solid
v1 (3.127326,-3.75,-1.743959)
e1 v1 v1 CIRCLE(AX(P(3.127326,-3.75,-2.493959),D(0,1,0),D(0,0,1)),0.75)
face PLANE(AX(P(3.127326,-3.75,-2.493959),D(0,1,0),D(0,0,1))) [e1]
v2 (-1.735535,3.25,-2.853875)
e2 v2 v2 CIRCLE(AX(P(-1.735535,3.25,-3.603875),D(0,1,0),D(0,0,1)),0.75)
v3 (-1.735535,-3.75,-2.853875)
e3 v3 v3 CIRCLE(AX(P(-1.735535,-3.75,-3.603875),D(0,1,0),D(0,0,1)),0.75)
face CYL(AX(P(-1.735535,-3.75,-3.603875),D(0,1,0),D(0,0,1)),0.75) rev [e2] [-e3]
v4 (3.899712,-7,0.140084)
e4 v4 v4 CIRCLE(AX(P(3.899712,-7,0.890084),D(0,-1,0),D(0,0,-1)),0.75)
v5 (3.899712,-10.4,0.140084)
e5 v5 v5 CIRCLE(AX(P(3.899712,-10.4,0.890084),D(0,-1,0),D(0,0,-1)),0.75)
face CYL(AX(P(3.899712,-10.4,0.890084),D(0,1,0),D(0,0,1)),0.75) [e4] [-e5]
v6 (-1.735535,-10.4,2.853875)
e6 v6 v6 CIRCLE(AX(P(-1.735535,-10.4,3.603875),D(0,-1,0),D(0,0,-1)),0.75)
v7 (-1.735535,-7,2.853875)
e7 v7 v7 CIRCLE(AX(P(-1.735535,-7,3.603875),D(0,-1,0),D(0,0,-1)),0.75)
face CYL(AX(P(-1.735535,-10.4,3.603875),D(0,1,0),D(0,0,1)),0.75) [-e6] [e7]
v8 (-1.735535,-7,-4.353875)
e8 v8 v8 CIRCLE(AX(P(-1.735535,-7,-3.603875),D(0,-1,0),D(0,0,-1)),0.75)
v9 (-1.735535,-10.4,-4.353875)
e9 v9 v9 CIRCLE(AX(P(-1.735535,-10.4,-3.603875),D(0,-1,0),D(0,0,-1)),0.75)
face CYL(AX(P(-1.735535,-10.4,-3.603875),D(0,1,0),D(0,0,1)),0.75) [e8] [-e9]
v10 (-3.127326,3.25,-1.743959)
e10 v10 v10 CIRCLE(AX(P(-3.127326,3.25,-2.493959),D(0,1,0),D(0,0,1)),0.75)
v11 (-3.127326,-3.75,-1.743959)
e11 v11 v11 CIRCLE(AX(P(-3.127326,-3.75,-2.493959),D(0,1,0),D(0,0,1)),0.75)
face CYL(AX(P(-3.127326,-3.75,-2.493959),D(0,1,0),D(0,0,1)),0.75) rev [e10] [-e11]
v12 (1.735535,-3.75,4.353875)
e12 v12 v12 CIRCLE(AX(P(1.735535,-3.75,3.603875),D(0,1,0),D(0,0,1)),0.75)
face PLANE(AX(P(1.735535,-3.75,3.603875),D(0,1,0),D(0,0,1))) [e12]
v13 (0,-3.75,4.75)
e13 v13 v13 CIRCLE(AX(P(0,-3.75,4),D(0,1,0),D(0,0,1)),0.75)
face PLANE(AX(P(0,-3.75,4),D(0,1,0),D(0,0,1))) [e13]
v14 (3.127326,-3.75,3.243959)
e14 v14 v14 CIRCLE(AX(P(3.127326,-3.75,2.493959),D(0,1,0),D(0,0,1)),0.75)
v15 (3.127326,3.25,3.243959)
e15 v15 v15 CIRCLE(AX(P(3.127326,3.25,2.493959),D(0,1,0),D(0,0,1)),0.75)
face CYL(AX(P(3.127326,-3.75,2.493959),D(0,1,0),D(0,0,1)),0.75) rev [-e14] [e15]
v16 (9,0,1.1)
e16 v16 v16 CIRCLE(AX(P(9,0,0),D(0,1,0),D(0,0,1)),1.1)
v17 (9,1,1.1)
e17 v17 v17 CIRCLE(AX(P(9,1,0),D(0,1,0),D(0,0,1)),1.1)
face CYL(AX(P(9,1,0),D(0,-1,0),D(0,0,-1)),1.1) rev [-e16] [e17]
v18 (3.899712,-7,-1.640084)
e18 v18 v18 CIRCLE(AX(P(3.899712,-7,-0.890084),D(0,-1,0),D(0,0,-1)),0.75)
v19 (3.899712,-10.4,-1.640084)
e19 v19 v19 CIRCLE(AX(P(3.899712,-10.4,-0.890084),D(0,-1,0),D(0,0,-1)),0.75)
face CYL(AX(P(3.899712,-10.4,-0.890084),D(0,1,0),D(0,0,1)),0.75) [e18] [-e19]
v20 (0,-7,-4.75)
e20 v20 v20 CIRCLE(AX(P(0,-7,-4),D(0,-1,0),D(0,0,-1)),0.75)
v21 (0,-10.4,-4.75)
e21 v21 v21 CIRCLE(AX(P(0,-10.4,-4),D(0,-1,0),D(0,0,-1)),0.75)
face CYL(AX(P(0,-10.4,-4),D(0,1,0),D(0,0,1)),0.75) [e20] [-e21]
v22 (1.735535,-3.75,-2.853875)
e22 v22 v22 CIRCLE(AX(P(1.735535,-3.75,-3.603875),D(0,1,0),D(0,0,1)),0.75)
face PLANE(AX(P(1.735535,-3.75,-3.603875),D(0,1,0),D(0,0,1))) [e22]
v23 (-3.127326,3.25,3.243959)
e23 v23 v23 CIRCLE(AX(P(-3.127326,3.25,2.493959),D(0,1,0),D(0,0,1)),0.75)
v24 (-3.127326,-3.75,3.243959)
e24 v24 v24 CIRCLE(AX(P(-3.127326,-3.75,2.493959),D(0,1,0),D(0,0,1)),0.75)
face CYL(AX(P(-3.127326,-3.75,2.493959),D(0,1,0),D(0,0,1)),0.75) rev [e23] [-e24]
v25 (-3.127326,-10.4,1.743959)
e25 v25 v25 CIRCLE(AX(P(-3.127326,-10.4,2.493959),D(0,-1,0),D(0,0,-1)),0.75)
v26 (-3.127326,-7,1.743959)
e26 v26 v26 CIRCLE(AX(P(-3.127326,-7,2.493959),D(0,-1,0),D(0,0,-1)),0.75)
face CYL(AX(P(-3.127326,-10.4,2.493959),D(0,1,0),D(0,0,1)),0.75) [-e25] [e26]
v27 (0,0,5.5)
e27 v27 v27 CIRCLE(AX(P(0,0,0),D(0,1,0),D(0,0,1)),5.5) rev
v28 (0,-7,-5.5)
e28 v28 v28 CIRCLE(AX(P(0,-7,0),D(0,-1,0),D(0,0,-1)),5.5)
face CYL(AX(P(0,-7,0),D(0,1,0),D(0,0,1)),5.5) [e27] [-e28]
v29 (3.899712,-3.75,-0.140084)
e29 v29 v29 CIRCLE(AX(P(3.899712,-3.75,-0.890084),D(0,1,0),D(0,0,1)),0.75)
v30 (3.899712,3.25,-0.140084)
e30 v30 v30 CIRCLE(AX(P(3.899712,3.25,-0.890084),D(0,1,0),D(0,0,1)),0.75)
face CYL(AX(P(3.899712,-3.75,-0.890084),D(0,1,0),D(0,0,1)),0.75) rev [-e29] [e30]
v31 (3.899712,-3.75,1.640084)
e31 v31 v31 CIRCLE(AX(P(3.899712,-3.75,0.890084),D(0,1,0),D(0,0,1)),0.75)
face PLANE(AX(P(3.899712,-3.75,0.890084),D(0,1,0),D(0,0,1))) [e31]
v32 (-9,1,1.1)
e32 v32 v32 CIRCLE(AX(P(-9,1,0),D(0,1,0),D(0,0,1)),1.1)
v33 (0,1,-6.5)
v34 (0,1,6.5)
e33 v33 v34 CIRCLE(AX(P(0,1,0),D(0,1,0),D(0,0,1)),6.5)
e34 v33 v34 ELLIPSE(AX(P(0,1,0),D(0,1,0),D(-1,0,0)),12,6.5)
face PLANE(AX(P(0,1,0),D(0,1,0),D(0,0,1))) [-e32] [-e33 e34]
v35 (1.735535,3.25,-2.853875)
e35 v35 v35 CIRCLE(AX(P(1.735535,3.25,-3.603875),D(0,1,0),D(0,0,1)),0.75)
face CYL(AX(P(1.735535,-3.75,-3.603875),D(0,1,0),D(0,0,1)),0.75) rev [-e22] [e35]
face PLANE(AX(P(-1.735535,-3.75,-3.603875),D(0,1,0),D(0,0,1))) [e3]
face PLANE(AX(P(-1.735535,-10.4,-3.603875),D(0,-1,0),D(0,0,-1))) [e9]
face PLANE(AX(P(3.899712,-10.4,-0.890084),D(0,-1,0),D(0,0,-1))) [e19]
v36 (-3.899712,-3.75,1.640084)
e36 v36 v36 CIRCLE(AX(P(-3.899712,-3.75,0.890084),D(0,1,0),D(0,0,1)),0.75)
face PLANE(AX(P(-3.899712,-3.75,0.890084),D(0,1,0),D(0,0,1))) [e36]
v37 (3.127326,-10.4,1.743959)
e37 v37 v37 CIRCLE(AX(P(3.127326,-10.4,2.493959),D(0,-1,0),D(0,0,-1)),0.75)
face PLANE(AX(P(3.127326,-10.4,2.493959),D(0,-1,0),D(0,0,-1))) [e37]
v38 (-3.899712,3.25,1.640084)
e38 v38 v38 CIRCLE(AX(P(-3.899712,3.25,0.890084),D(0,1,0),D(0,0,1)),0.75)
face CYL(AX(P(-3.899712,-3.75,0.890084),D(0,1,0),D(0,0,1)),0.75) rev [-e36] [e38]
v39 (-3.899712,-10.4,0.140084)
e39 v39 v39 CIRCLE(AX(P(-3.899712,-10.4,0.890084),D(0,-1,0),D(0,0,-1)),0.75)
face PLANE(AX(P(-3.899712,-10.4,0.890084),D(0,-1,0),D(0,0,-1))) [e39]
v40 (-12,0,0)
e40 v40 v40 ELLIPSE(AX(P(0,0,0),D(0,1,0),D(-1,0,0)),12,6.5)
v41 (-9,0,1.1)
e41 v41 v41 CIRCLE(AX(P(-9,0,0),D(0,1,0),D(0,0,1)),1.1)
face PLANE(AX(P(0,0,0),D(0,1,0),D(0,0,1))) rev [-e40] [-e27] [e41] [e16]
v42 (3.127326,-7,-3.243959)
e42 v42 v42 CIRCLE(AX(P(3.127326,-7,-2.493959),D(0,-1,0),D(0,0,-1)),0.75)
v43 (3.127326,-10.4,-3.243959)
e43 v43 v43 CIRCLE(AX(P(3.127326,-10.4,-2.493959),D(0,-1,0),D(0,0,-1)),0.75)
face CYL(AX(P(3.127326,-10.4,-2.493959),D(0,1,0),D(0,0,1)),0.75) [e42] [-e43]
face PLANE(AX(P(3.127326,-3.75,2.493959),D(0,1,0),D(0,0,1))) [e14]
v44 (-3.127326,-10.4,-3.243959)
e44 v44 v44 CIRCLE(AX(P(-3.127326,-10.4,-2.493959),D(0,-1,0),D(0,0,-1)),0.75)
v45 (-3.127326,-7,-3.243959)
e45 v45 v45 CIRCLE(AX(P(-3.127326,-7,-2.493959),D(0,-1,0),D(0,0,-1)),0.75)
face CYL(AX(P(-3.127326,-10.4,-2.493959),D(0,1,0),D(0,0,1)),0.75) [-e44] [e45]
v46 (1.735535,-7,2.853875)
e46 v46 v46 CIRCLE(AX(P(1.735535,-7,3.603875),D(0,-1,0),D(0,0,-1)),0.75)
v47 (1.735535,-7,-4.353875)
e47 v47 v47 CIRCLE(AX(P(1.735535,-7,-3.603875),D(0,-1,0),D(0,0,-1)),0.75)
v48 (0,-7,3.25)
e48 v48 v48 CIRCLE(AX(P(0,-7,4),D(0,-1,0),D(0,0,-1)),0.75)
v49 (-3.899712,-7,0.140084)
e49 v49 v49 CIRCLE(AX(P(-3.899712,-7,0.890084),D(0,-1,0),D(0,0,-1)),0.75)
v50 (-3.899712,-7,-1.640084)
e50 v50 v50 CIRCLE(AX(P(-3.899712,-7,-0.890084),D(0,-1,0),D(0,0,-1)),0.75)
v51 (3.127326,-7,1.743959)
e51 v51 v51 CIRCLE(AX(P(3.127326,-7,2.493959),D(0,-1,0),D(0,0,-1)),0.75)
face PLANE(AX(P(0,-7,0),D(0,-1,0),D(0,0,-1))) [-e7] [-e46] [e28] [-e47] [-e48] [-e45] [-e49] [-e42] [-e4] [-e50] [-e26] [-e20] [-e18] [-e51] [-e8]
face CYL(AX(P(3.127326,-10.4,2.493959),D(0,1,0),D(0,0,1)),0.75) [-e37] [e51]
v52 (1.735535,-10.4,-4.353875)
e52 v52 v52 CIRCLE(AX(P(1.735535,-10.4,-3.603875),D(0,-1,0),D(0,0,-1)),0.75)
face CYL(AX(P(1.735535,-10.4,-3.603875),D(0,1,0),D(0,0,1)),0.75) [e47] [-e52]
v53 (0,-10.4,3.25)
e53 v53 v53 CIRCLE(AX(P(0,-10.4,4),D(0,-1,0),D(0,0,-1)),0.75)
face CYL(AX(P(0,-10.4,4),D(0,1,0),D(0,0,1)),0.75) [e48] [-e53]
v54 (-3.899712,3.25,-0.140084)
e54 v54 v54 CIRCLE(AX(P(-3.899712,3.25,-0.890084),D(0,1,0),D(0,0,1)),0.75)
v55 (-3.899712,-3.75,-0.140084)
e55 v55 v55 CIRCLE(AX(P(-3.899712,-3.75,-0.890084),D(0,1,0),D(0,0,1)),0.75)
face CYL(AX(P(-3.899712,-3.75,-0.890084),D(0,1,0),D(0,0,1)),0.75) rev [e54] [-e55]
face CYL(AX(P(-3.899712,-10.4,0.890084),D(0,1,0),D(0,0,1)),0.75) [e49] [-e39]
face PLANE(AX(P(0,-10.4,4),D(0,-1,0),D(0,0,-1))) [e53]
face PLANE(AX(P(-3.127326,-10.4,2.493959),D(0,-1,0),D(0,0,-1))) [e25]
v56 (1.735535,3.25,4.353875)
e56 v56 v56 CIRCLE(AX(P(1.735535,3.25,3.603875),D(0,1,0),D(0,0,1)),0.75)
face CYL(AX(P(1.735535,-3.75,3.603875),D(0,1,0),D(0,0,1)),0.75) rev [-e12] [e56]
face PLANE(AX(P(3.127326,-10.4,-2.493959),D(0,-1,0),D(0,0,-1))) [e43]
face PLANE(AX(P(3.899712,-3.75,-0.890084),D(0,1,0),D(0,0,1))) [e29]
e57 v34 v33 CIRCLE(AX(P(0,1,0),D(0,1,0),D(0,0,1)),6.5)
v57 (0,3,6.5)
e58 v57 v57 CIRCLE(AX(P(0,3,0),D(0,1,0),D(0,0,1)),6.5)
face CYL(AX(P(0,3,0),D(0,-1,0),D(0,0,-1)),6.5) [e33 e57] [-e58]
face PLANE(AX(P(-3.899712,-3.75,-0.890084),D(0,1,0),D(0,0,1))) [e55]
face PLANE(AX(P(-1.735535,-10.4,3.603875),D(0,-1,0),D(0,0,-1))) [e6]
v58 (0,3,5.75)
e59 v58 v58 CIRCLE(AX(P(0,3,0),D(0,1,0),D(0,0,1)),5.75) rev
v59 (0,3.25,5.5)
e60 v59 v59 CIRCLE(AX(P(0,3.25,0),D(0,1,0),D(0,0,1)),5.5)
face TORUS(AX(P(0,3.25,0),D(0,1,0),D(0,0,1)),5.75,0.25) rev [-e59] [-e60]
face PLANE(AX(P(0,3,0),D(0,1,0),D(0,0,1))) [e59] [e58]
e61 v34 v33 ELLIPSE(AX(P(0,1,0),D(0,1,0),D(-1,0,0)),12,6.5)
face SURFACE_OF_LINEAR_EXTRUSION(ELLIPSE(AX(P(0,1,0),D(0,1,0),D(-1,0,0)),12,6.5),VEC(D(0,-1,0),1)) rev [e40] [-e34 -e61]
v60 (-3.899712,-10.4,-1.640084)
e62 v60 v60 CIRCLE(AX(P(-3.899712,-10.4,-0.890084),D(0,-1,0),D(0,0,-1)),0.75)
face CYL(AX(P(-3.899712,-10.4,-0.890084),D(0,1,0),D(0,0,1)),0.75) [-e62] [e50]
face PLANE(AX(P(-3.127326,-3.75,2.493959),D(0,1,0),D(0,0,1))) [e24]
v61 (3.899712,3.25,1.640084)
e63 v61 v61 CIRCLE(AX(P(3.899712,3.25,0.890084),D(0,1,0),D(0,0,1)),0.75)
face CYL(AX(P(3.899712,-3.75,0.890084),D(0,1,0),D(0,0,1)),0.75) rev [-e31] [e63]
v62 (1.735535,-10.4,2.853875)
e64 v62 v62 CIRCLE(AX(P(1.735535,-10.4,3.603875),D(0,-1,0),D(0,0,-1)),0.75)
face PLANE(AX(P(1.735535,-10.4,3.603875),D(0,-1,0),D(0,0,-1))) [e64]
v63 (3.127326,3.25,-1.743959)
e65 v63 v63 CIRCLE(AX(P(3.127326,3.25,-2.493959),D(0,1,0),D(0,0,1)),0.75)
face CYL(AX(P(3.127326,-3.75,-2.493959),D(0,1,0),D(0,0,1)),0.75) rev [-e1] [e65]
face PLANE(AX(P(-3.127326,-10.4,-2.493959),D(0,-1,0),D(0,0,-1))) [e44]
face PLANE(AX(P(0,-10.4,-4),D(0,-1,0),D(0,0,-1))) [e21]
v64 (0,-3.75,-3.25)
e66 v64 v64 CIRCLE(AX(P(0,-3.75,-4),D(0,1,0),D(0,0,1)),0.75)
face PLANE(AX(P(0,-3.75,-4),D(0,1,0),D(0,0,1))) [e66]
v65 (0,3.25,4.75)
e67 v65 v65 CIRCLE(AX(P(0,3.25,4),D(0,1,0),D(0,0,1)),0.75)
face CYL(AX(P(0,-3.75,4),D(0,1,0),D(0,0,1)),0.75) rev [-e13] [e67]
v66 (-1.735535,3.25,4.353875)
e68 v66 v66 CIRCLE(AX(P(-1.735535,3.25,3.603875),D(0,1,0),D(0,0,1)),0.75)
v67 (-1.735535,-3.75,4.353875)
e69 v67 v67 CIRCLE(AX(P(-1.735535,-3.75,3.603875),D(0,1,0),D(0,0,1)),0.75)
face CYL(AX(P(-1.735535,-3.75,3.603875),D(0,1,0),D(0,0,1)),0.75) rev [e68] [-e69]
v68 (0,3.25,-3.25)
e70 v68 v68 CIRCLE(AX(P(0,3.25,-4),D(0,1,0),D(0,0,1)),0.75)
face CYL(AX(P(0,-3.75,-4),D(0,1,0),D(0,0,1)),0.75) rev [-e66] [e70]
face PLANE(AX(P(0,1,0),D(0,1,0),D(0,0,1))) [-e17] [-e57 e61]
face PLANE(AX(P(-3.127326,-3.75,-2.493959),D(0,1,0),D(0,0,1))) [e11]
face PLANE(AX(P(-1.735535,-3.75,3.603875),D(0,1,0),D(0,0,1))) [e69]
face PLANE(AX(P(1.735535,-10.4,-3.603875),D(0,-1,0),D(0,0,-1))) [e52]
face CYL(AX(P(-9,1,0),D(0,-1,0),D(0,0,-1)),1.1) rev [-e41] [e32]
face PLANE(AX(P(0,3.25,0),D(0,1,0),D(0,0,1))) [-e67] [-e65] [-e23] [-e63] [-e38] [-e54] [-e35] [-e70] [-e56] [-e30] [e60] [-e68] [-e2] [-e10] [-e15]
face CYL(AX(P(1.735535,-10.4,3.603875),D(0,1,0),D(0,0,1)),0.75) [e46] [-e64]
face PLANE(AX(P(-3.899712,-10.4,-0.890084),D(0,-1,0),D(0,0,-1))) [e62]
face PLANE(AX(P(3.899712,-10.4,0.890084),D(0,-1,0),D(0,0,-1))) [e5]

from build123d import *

# Parameters (mm, degrees)
SKETCH1_RX          = 12
SKETCH1_RY          = 6.5
SKETCH1_R           = 1.1
BOSS_EXTRUDE1_DEPTH = 1
SKETCH2_R           = 6.5
BOSS_EXTRUDE2_DEPTH = 2
SKETCH4_R           = 5.5
BOSS_EXTRUDE3_DEPTH = 7
BOSS_EXTRUDE5_START = 0.25
SKETCH7_R           = 5.5
BOSS_EXTRUDE5_DEPTH = 0.25
SKETCH5_R           = 0.75
CUT_EXTRUDE2_DEPTH  = 7
SKETCH6_R           = 0.75
BOSS_EXTRUDE4_DEPTH = 3.4
FILLET1_R           = 0.25


with BuildPart() as part:
    # Sketch1 → Boss-Extrude1 (new body)
    with BuildSketch(Plane(origin=(0, 0, 0), x_dir=(1, 0, 0), z_dir=(0, 1, 0))):
        with Locations(Location((0, 0), (0, 0, 180))):
            Ellipse(SKETCH1_RX, SKETCH1_RY)
        with Locations(Location((-9, 0, 0), (0, 0, 270))):
            Circle(SKETCH1_R, mode=Mode.SUBTRACT)
        with Locations(Location((9, 0, 0), (0, 0, 270))):
            Circle(SKETCH1_R, mode=Mode.SUBTRACT)
    extrude(amount=BOSS_EXTRUDE1_DEPTH)

    # Sketch2 → Boss-Extrude2 (add)
    with BuildSketch(Plane(origin=(0, 1, 0), x_dir=(1, 0, 0), z_dir=(0, 1, 0))):
        with Locations(Location((0, 0, 0), (0, 0, 270))):
            Circle(SKETCH2_R)
    extrude(amount=BOSS_EXTRUDE2_DEPTH)

    # Sketch4 → Boss-Extrude3 (add)
    with BuildSketch(Plane.XZ):
        with Locations(Location((0, 0, 0), (0, 0, 90))):
            Circle(SKETCH4_R)
    extrude(amount=BOSS_EXTRUDE3_DEPTH)

    # Sketch7 → Boss-Extrude5 (add)
    with BuildSketch(Plane(origin=(0, 3, 0), x_dir=(1, 0, 0), z_dir=(0, 1, 0)).offset(BOSS_EXTRUDE5_START)):
        with Locations(Location((0, 0, 0), (0, 0, 270))):
            Circle(SKETCH7_R)
    extrude(amount=-BOSS_EXTRUDE5_DEPTH)

    # Sketch5 → Cut-Extrude2 (cut)
    with BuildSketch(Plane(origin=(0, 3.25, 0), x_dir=(1, 0, 0), z_dir=(0, 1, 0))):
        with Locations(Location((0, -4, 0), (0, 0, 270))):
            Circle(SKETCH5_R)
        with Locations(Location((-1.735534956, -3.603875472, 0), (0, 0, 270))):
            Circle(SKETCH5_R)
        with Locations(Location((-3.12732593, -2.493959207, 0), (0, 0, 270))):
            Circle(SKETCH5_R)
        with Locations(Location((-3.899711649, -0.890083736, 0), (0, 0, 270))):
            Circle(SKETCH5_R)
        with Locations(Location((-3.899711649, 0.890083736, 0), (0, 0, 270))):
            Circle(SKETCH5_R)
        with Locations(Location((-3.12732593, 2.493959207, 0), (0, 0, 270))):
            Circle(SKETCH5_R)
        with Locations(Location((-1.735534956, 3.603875472, 0), (0, 0, 270))):
            Circle(SKETCH5_R)
        with Locations(Location((0, 4, 0), (0, 0, 270))):
            Circle(SKETCH5_R)
        with Locations(Location((1.735534956, 3.603875472, 0), (0, 0, 270))):
            Circle(SKETCH5_R)
        with Locations(Location((3.12732593, 2.493959207, 0), (0, 0, 270))):
            Circle(SKETCH5_R)
        with Locations(Location((3.899711649, 0.890083736, 0), (0, 0, 270))):
            Circle(SKETCH5_R)
        with Locations(Location((3.899711649, -0.890083736, 0), (0, 0, 270))):
            Circle(SKETCH5_R)
        with Locations(Location((3.12732593, -2.493959207, 0), (0, 0, 270))):
            Circle(SKETCH5_R)
        with Locations(Location((1.735534956, -3.603875472, 0), (0, 0, 270))):
            Circle(SKETCH5_R)
    extrude(amount=-CUT_EXTRUDE2_DEPTH, mode=Mode.SUBTRACT)

    # Sketch6 → Boss-Extrude4 (add)
    with BuildSketch(Plane.XZ.offset(7)):
        with Locations(Location((0, -4, 0), (0, 0, 90))):
            Circle(SKETCH6_R)
        with Locations(Location((-1.735534956, -3.603875472, 0), (0, 0, 90))):
            Circle(SKETCH6_R)
        with Locations(Location((-3.12732593, -2.493959207, 0), (0, 0, 90))):
            Circle(SKETCH6_R)
        with Locations(Location((-3.899711649, -0.890083736, 0), (0, 0, 90))):
            Circle(SKETCH6_R)
        with Locations(Location((-3.899711649, 0.890083736, 0), (0, 0, 90))):
            Circle(SKETCH6_R)
        with Locations(Location((-3.12732593, 2.493959207, 0), (0, 0, 90))):
            Circle(SKETCH6_R)
        with Locations(Location((-1.735534956, 3.603875472, 0), (0, 0, 90))):
            Circle(SKETCH6_R)
        with Locations(Location((0, 4, 0), (0, 0, 90))):
            Circle(SKETCH6_R)
        with Locations(Location((1.735534956, 3.603875472, 0), (0, 0, 90))):
            Circle(SKETCH6_R)
        with Locations(Location((3.12732593, 2.493959207, 0), (0, 0, 90))):
            Circle(SKETCH6_R)
        with Locations(Location((3.899711649, 0.890083736, 0), (0, 0, 90))):
            Circle(SKETCH6_R)
        with Locations(Location((3.899711649, -0.890083736, 0), (0, 0, 90))):
            Circle(SKETCH6_R)
        with Locations(Location((3.12732593, -2.493959207, 0), (0, 0, 90))):
            Circle(SKETCH6_R)
        with Locations(Location((1.735534956, -3.603875472, 0), (0, 0, 90))):
            Circle(SKETCH6_R)
    extrude(amount=BOSS_EXTRUDE4_DEPTH)

    # Fillet1
    fillet1_edges = [part.edges().sort_by_distance(p)[0] for p in [
        (0, 3, -5.5),
    ]]
    fillet(fillet1_edges, radius=FILLET1_R - 0.0001)  # a hair under: the kernel refuses the full size


solid = part.part
